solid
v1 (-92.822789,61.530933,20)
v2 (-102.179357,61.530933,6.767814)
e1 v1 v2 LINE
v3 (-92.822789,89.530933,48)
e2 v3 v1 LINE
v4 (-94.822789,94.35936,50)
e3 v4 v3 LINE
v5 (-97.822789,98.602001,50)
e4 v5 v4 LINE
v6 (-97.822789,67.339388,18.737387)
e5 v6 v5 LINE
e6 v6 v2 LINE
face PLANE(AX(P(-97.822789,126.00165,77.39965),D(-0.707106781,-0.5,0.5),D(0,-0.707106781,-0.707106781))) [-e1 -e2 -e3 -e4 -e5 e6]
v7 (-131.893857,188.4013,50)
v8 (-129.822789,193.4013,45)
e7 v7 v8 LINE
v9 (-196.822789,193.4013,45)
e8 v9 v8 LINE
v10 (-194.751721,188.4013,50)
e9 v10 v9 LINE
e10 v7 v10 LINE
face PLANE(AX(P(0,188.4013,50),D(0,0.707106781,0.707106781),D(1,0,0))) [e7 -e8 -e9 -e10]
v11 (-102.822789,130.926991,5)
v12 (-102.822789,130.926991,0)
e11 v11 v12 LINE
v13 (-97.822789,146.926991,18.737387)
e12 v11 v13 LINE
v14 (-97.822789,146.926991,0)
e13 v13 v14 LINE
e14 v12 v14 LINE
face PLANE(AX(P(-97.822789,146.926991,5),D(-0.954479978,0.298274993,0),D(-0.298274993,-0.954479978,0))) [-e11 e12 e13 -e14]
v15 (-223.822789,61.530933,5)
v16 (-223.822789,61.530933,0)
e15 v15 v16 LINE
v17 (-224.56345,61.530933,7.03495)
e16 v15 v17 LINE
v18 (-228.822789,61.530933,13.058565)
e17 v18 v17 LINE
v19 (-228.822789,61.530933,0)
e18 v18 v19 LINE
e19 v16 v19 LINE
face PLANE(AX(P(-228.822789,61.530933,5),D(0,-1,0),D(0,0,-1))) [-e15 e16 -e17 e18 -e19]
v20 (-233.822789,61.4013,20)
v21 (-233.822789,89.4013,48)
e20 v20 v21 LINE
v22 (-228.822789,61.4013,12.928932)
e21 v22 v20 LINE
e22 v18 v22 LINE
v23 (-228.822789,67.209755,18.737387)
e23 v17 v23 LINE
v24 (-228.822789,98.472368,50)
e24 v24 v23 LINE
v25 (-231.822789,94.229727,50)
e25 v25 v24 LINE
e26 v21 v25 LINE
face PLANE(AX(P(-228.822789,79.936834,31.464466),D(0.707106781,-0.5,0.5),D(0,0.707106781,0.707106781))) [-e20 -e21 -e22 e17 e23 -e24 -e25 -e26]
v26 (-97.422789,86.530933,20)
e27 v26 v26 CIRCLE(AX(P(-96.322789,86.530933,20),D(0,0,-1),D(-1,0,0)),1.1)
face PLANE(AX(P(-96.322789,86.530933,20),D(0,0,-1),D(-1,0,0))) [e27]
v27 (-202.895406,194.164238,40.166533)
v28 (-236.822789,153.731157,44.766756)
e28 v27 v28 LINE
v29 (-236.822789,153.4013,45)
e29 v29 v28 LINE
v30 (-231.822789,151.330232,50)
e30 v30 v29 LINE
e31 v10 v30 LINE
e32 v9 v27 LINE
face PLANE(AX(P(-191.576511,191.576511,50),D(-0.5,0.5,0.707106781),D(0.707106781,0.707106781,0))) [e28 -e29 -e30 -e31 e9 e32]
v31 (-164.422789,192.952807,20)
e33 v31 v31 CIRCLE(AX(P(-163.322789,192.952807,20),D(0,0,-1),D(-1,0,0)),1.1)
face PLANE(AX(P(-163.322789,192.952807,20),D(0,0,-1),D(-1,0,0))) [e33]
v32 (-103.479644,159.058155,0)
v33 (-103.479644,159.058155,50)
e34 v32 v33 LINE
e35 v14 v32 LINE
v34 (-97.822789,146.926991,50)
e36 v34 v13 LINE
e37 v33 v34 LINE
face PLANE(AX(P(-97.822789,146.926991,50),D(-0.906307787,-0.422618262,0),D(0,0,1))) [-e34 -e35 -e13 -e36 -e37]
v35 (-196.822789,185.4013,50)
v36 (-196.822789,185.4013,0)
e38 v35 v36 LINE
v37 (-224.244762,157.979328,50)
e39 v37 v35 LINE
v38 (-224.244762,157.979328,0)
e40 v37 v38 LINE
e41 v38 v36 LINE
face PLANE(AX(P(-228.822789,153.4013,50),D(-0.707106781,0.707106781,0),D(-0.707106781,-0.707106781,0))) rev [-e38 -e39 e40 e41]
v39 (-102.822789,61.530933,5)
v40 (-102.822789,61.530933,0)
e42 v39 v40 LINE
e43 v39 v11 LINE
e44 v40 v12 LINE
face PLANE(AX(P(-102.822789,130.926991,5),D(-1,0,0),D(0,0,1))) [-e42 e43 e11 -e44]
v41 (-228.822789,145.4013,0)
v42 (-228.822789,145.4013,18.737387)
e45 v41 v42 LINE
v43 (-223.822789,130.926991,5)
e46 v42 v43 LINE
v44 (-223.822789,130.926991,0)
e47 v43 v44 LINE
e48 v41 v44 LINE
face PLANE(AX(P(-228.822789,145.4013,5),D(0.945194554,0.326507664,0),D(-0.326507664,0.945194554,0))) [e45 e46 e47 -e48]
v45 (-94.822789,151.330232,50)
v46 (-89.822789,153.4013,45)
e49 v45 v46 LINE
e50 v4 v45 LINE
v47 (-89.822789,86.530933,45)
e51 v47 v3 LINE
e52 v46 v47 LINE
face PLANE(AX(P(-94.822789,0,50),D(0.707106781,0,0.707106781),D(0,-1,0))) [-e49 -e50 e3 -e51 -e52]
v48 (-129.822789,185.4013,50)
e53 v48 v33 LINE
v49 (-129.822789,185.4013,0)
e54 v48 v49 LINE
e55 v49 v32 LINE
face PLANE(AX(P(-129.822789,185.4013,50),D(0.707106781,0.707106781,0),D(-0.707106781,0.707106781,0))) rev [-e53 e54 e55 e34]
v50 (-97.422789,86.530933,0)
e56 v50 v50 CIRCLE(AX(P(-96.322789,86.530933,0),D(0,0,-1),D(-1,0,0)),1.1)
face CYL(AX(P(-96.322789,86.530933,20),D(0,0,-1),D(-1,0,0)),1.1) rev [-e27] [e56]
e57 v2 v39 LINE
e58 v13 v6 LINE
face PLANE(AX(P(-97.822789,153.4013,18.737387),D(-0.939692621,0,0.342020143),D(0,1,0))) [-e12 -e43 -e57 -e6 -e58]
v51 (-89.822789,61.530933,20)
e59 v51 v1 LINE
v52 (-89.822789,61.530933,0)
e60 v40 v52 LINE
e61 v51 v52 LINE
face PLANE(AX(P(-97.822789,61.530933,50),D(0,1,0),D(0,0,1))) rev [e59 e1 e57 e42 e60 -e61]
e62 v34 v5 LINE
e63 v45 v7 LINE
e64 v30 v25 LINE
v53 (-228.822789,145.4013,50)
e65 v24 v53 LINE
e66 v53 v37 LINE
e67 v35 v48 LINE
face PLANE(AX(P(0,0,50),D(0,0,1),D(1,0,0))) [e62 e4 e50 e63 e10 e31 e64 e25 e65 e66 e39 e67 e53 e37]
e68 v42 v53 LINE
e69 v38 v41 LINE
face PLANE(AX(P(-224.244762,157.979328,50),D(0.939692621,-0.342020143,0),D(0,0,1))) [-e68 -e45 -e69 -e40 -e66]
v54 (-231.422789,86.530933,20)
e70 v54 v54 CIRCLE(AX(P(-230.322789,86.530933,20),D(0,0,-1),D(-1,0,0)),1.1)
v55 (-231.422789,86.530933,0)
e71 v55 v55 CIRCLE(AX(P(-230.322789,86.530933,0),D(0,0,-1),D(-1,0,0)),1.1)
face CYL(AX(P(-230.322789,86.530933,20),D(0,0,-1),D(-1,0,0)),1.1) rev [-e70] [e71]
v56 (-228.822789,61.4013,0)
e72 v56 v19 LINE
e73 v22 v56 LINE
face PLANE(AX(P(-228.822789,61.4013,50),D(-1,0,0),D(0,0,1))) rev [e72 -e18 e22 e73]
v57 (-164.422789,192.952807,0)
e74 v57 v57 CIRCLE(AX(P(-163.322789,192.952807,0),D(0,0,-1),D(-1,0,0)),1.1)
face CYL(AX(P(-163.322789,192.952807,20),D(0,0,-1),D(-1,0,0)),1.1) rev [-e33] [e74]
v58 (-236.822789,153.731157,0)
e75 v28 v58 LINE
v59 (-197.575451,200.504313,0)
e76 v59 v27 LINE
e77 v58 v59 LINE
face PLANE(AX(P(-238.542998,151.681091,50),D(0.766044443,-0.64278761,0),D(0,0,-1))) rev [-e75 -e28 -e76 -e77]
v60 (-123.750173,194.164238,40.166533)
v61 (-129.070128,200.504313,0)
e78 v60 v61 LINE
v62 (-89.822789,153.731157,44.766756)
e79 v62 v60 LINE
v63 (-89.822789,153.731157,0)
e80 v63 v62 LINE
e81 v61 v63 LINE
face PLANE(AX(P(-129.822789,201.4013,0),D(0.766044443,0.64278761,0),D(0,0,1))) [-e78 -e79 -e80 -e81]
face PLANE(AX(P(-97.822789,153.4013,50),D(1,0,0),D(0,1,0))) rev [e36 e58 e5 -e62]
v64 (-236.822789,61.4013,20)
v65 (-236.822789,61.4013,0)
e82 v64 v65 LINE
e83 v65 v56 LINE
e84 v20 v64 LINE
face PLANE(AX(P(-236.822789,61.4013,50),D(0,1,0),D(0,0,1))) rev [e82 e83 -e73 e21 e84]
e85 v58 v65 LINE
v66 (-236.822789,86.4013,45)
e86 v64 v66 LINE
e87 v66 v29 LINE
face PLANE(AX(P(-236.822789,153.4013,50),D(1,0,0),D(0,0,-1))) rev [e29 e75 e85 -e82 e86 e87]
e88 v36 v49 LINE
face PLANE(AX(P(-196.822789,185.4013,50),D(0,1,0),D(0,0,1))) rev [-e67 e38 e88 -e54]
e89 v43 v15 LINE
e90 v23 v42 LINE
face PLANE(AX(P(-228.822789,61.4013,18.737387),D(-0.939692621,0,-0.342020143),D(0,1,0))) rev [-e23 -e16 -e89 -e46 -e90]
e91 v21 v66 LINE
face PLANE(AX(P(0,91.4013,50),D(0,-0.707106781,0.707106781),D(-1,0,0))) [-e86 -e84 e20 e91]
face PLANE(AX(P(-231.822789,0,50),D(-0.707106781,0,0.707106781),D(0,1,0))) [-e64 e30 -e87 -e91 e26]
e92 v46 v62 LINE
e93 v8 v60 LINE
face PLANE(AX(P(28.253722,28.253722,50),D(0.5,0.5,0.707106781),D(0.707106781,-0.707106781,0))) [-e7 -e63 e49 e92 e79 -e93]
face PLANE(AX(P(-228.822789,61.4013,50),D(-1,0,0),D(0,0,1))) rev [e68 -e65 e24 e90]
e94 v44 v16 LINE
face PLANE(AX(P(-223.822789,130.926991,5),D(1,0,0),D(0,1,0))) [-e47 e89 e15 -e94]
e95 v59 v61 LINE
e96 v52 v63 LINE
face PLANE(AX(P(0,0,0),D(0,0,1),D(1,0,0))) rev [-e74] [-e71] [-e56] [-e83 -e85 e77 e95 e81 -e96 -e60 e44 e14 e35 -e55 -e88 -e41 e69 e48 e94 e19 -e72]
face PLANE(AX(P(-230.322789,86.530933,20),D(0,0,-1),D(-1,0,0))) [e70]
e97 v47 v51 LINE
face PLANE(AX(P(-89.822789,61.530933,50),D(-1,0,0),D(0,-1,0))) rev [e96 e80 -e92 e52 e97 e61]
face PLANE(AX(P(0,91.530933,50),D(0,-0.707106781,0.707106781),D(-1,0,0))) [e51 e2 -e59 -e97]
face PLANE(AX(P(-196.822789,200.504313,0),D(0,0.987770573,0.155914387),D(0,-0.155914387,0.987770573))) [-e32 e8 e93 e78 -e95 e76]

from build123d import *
from OCP.BRepFilletAPI import BRepFilletAPI_MakeChamfer

# Parameters (mm, degrees)
EXTRUDE_2_DEPTH     = 50
CHAMFER_1_SIZE      = 30
CHAMFER_2_SIZE      = 5
CHAMFER_3_SIZE      = 5
EXTRUDE_3_DEPTH     = 67
CHAMFER_6_SIZE      = 8
CHAMFER_6_SIZE2     = 6.474308837
CHAMFER_7_SIZE      = 59.001285691
CHAMFER_7_SIZE_2    = 8
CHAMFER_8_SIZE      = 59.001285691
CHAMFER_8_SIZE_2    = 8
EXTRUDE_4_DEPTH     = 5
CHAMFER_9_SIZE      = 13.737387097
CHAMFER_9_SIZE_2    = 5
SKETCH_5_R          = 1.1
CUT_EXTRUDE_1_DEPTH = 20


with BuildPart() as part:
    # Эскиз2 → Бобышка-Вытянуть2 (new body)
    with BuildSketch(Plane.XY):
        Polygon((-228.822789272, 61.401300251), (-228.822789272, 153.401300251), (-196.822789272, 185.401300251), (-129.822789272, 185.401300251), (-97.822789272, 153.401300251), (-97.822789272, 61.530932705), (-89.822789272, 61.530932705), (-89.822789272, 153.401300251), (-129.822789272, 193.401300251), (-196.822789272, 193.401300251), (-236.822789272, 153.401300251), (-236.822789272, 61.401300251), align=None)
    extrude(amount=EXTRUDE_2_DEPTH)

    # Фаска1
    chamfer_1_edges = [part.edges().sort_by_distance(p)[0] for p in [
        (-93.822789272, 61.530932705, 50),
        (-232.822789272, 61.401300251, 50),
    ]]
    chamfer(chamfer_1_edges, length=CHAMFER_1_SIZE)

    # Фаска2
    chamfer_2_edges = [part.edges().sort_by_distance(p)[0] for p in [
        (-109.822789272, 173.401300251, 50),
        (-89.822789272, 122.466116478, 50),
        (-163.322789272, 193.401300251, 50),
        (-216.822789272, 173.401300251, 50),
        (-236.822789272, 122.401300251, 50),
    ]]
    chamfer(chamfer_2_edges, length=CHAMFER_2_SIZE)

    # Фаска3
    chamfer_3_edges = [part.edges().sort_by_distance(p)[0] for p in [
        (-97.822789272, 76.530932705, 35),
        (-228.822789272, 76.401300251, 35),
    ]]
    chamfer(chamfer_3_edges, length=CHAMFER_3_SIZE)

    # Эскиз3 → Бобышка-Вытянуть3 (add)
    with BuildSketch(Plane(origin=(-129.822789272, 0, 0), x_dir=(0, 0, -1), z_dir=(1, 0, 0))):
        Polygon((-45, 193.401300251), (0, 193.401300251), (0, 200.504313431), align=None)
    extrude(amount=-EXTRUDE_3_DEPTH)

    # Фаска6: one chamfer whose edges measure the first distance from different faces: ONE call of the kernel's chamfer builder (chamfer() names one face for all edges)
    chamfer_6_edges_1 = [part.edges().sort_by_distance(p)[0] for p in [
        (-97.822789272, 153.401300251, 25),
    ]]
    chamfer_6_side_1 = [part.faces().sort_by_distance(p)[0] for p in [
        (-113.822789272, 169.401300251, 25),
    ]]
    chamfer_6_edges_2 = [part.edges().sort_by_distance(p)[0] for p in [
        (-228.822789272, 153.401300251, 25),
    ]]
    chamfer_6_side_2 = [part.faces().sort_by_distance(p)[0] for p in [
        (-228.822789272, 113.309285826, 22.779788417),
    ]]
    chamfer_6 = BRepFilletAPI_MakeChamfer(part.part.solid().wrapped)
    for e in chamfer_6_edges_1:
        chamfer_6.Add(CHAMFER_6_SIZE, CHAMFER_6_SIZE2, e.wrapped, chamfer_6_side_1[0].wrapped)  # the first distance lies on this face
    for e in chamfer_6_edges_2:
        chamfer_6.Add(CHAMFER_6_SIZE, CHAMFER_6_SIZE2, e.wrapped, chamfer_6_side_2[0].wrapped)  # the first distance lies on this face
    add(Compound.cast(chamfer_6.Shape()), mode=Mode.REPLACE)

    # Фаска7
    # the kernel refuses this chamfer: 59.001285691, 8 mm, written as the material it adds along each edge
    with BuildSketch(Plane(origin=(-196.822789272, 193.401300251, 0), x_dir=(-0.7047321498610482, -0.7094734645863968, 0), z_dir=(0, 0, 1))) as chamfer_7_piece_1_section:
        Polygon((CHAMFER_7_SIZE * 0.999994379973, -CHAMFER_7_SIZE * 0.00335261579405), (-CHAMFER_7_SIZE_2 * 0.709473464586, -CHAMFER_7_SIZE_2 * 0.704732149861), (0, 0), align=None)
    chamfer_7_piece_1 = extrude(amount=198.381753037, mode=Mode.PRIVATE)
    chamfer_7_piece_1 = split(chamfer_7_piece_1, bisect_by=Plane(origin=(-220.880283212, 186.62893037, 32.777571564), z_dir=(0.49999999999999994, -0.5, -0.7071067811865477)), keep=Keep.TOP, mode=Mode.PRIVATE)
    chamfer_7_piece_1 = split(chamfer_7_piece_1, bisect_by=Plane(origin=(-236.822789272, 178.689900101, 21.550087285), z_dir=(1, 0, 0)), keep=Keep.TOP, mode=Mode.PRIVATE)
    chamfer_7_piece_1 = split(chamfer_7_piece_1, bisect_by=Plane(origin=(-212.941252942, 196.655142254, 24.385806214), z_dir=(1.0444770759811184e-15, -0.9877705725829901, -0.1559143865686293)), keep=Keep.TOP, mode=Mode.PRIVATE)
    add(chamfer_7_piece_1)

    # Фаска8
    # the kernel refuses this chamfer: 59.001285691, 8 mm, written as the material it adds along each edge
    with BuildSketch(Plane(origin=(-129.822789272, 193.401300251, 0), x_dir=(0.7047321498610463, -0.7094734645863986, 0), z_dir=(0, 0, 1))) as chamfer_8_piece_1_section:
        Polygon((CHAMFER_8_SIZE * 0.999994379973, CHAMFER_8_SIZE * 0.00335261579405), (-CHAMFER_8_SIZE_2 * 0.709473464586, CHAMFER_8_SIZE_2 * 0.704732149861), (0, 0), align=None)
    chamfer_8_piece_1 = extrude(amount=198.381753037, mode=Mode.PRIVATE)
    chamfer_8_piece_1 = split(chamfer_8_piece_1, bisect_by=Plane(origin=(-89.822789272, 178.689900101, 21.550087285), z_dir=(-1, 0, 0)), keep=Keep.TOP, mode=Mode.PRIVATE)
    chamfer_8_piece_1 = split(chamfer_8_piece_1, bisect_by=Plane(origin=(-105.765295333, 186.62893037, 32.777571565), z_dir=(-0.5000000000000016, -0.4999999999999975, -0.7071067811865482)), keep=Keep.TOP, mode=Mode.PRIVATE)
    chamfer_8_piece_1 = split(chamfer_8_piece_1, bisect_by=Plane(origin=(-113.704325602, 196.655142254, 24.385806214), z_dir=(0, -0.9877705725829332, -0.15591438656898948)), keep=Keep.TOP, mode=Mode.PRIVATE)
    add(chamfer_8_piece_1)

    # Эскиз4 → Бобышка-Вытянуть4 (add)
    with BuildSketch(Plane(origin=(0, 0, 0), x_dir=(-1, 0, 0), z_dir=(0, 0, -1))):
        Polygon((97.822789272, 146.926991414), (102.822789272, 130.926991414), (102.822789272, 61.530932705), (97.822789272, 61.530932705), align=None)
        Polygon((228.822789272, 145.401300251), (228.822789272, 61.530932705), (223.822789272, 61.530932705), (223.822789272, 130.926991414), align=None)
    extrude(amount=-EXTRUDE_4_DEPTH)

    # Фаска9
    # the kernel refuses this chamfer: 13.737387097, 5 mm, written as the material it adds along each edge
    with BuildSketch(Plane(origin=(-97.822789272, 61.530932705, 5), x_dir=(0.013184058198649358, 0, 0.9999130865277315), z_dir=(0, 1, 0))) as chamfer_9_piece_1_section:
        Polygon((CHAMFER_9_SIZE * 0.999913086548, -CHAMFER_9_SIZE * 0.0131840581989), (-CHAMFER_9_SIZE_2 * 0.0131840581986, -CHAMFER_9_SIZE_2 * 0.999913086528), (0, 0), align=None)
    chamfer_9_piece_1 = extrude(amount=121.033515956, mode=Mode.PRIVATE)
    chamfer_9_piece_1 = split(chamfer_9_piece_1, bisect_by=Plane(origin=(-114.063470216, 91.772466116, 20.202674346), z_dir=(0.7071067811865477, 0.5, -0.4999999999999999)), keep=Keep.TOP, mode=Mode.PRIVATE)
    chamfer_9_piece_1 = split(chamfer_9_piece_1, bisect_by=Plane(origin=(-110.682470029, 105.776012992, 9.758348452), z_dir=(0.9544799780350295, -0.2982749931359476, 0)), keep=Keep.TOP, mode=Mode.PRIVATE)
    chamfer_9_piece_1 = split(chamfer_9_piece_1, bisect_by=Plane(origin=(-102.822789272, 102.21679201, 9.758348452), z_dir=(1, 0, 0)), keep=Keep.TOP, mode=Mode.PRIVATE)
    add(chamfer_9_piece_1)
    with BuildSketch(Plane(origin=(-228.822789272, 181.038757498, 5), x_dir=(0.9950833631817486, 0, -0.09904090225205033), z_dir=(0, -1, 0))) as chamfer_9_piece_2_section:
        Polygon((CHAMFER_9_SIZE_2 * 0.995083363182, CHAMFER_9_SIZE_2 * 0.0990409022521), (-CHAMFER_9_SIZE * 0.099040902254, CHAMFER_9_SIZE * 0.995083363202), (0, 0), align=None)
    chamfer_9_piece_2 = extrude(amount=119.507824793, mode=Mode.PRIVATE)
    chamfer_9_piece_2 = split(chamfer_9_piece_2, bisect_by=Plane(origin=(-199.458401516, 124.497296703, 34.497413224), z_dir=(-0.7071067811865471, 0.5000000000000006, -0.5000000000000001)), keep=Keep.TOP, mode=Mode.PRIVATE)
    chamfer_9_piece_2 = split(chamfer_9_piece_2, bisect_by=Plane(origin=(-228.851428884, 145.484207968, 13.577093316), z_dir=(-0.945194554128901, -0.32650766429759087, 0)), keep=Keep.TOP, mode=Mode.PRIVATE)
    chamfer_9_piece_2 = split(chamfer_9_piece_2, bisect_by=Plane(origin=(-223.822789272, 145.417616611, 13.577093316), z_dir=(-1, 0, 0)), keep=Keep.TOP, mode=Mode.PRIVATE)
    add(chamfer_9_piece_2)

    # Эскиз5 → Вырез-Вытянуть1 (cut)
    with BuildSketch(Plane(origin=(0, 0, 0), x_dir=(-1, 0, 0), z_dir=(0, 0, -1))):
        with Locations((96.322789272, 86.530932705)):
            Circle(SKETCH_5_R)
        with Locations((230.322789272, 86.530932705)):
            Circle(SKETCH_5_R)
        with Locations((163.322789272, 192.952806841)):
            Circle(SKETCH_5_R)
    extrude(amount=-CUT_EXTRUDE_1_DEPTH, mode=Mode.SUBTRACT)


solid = part.part
